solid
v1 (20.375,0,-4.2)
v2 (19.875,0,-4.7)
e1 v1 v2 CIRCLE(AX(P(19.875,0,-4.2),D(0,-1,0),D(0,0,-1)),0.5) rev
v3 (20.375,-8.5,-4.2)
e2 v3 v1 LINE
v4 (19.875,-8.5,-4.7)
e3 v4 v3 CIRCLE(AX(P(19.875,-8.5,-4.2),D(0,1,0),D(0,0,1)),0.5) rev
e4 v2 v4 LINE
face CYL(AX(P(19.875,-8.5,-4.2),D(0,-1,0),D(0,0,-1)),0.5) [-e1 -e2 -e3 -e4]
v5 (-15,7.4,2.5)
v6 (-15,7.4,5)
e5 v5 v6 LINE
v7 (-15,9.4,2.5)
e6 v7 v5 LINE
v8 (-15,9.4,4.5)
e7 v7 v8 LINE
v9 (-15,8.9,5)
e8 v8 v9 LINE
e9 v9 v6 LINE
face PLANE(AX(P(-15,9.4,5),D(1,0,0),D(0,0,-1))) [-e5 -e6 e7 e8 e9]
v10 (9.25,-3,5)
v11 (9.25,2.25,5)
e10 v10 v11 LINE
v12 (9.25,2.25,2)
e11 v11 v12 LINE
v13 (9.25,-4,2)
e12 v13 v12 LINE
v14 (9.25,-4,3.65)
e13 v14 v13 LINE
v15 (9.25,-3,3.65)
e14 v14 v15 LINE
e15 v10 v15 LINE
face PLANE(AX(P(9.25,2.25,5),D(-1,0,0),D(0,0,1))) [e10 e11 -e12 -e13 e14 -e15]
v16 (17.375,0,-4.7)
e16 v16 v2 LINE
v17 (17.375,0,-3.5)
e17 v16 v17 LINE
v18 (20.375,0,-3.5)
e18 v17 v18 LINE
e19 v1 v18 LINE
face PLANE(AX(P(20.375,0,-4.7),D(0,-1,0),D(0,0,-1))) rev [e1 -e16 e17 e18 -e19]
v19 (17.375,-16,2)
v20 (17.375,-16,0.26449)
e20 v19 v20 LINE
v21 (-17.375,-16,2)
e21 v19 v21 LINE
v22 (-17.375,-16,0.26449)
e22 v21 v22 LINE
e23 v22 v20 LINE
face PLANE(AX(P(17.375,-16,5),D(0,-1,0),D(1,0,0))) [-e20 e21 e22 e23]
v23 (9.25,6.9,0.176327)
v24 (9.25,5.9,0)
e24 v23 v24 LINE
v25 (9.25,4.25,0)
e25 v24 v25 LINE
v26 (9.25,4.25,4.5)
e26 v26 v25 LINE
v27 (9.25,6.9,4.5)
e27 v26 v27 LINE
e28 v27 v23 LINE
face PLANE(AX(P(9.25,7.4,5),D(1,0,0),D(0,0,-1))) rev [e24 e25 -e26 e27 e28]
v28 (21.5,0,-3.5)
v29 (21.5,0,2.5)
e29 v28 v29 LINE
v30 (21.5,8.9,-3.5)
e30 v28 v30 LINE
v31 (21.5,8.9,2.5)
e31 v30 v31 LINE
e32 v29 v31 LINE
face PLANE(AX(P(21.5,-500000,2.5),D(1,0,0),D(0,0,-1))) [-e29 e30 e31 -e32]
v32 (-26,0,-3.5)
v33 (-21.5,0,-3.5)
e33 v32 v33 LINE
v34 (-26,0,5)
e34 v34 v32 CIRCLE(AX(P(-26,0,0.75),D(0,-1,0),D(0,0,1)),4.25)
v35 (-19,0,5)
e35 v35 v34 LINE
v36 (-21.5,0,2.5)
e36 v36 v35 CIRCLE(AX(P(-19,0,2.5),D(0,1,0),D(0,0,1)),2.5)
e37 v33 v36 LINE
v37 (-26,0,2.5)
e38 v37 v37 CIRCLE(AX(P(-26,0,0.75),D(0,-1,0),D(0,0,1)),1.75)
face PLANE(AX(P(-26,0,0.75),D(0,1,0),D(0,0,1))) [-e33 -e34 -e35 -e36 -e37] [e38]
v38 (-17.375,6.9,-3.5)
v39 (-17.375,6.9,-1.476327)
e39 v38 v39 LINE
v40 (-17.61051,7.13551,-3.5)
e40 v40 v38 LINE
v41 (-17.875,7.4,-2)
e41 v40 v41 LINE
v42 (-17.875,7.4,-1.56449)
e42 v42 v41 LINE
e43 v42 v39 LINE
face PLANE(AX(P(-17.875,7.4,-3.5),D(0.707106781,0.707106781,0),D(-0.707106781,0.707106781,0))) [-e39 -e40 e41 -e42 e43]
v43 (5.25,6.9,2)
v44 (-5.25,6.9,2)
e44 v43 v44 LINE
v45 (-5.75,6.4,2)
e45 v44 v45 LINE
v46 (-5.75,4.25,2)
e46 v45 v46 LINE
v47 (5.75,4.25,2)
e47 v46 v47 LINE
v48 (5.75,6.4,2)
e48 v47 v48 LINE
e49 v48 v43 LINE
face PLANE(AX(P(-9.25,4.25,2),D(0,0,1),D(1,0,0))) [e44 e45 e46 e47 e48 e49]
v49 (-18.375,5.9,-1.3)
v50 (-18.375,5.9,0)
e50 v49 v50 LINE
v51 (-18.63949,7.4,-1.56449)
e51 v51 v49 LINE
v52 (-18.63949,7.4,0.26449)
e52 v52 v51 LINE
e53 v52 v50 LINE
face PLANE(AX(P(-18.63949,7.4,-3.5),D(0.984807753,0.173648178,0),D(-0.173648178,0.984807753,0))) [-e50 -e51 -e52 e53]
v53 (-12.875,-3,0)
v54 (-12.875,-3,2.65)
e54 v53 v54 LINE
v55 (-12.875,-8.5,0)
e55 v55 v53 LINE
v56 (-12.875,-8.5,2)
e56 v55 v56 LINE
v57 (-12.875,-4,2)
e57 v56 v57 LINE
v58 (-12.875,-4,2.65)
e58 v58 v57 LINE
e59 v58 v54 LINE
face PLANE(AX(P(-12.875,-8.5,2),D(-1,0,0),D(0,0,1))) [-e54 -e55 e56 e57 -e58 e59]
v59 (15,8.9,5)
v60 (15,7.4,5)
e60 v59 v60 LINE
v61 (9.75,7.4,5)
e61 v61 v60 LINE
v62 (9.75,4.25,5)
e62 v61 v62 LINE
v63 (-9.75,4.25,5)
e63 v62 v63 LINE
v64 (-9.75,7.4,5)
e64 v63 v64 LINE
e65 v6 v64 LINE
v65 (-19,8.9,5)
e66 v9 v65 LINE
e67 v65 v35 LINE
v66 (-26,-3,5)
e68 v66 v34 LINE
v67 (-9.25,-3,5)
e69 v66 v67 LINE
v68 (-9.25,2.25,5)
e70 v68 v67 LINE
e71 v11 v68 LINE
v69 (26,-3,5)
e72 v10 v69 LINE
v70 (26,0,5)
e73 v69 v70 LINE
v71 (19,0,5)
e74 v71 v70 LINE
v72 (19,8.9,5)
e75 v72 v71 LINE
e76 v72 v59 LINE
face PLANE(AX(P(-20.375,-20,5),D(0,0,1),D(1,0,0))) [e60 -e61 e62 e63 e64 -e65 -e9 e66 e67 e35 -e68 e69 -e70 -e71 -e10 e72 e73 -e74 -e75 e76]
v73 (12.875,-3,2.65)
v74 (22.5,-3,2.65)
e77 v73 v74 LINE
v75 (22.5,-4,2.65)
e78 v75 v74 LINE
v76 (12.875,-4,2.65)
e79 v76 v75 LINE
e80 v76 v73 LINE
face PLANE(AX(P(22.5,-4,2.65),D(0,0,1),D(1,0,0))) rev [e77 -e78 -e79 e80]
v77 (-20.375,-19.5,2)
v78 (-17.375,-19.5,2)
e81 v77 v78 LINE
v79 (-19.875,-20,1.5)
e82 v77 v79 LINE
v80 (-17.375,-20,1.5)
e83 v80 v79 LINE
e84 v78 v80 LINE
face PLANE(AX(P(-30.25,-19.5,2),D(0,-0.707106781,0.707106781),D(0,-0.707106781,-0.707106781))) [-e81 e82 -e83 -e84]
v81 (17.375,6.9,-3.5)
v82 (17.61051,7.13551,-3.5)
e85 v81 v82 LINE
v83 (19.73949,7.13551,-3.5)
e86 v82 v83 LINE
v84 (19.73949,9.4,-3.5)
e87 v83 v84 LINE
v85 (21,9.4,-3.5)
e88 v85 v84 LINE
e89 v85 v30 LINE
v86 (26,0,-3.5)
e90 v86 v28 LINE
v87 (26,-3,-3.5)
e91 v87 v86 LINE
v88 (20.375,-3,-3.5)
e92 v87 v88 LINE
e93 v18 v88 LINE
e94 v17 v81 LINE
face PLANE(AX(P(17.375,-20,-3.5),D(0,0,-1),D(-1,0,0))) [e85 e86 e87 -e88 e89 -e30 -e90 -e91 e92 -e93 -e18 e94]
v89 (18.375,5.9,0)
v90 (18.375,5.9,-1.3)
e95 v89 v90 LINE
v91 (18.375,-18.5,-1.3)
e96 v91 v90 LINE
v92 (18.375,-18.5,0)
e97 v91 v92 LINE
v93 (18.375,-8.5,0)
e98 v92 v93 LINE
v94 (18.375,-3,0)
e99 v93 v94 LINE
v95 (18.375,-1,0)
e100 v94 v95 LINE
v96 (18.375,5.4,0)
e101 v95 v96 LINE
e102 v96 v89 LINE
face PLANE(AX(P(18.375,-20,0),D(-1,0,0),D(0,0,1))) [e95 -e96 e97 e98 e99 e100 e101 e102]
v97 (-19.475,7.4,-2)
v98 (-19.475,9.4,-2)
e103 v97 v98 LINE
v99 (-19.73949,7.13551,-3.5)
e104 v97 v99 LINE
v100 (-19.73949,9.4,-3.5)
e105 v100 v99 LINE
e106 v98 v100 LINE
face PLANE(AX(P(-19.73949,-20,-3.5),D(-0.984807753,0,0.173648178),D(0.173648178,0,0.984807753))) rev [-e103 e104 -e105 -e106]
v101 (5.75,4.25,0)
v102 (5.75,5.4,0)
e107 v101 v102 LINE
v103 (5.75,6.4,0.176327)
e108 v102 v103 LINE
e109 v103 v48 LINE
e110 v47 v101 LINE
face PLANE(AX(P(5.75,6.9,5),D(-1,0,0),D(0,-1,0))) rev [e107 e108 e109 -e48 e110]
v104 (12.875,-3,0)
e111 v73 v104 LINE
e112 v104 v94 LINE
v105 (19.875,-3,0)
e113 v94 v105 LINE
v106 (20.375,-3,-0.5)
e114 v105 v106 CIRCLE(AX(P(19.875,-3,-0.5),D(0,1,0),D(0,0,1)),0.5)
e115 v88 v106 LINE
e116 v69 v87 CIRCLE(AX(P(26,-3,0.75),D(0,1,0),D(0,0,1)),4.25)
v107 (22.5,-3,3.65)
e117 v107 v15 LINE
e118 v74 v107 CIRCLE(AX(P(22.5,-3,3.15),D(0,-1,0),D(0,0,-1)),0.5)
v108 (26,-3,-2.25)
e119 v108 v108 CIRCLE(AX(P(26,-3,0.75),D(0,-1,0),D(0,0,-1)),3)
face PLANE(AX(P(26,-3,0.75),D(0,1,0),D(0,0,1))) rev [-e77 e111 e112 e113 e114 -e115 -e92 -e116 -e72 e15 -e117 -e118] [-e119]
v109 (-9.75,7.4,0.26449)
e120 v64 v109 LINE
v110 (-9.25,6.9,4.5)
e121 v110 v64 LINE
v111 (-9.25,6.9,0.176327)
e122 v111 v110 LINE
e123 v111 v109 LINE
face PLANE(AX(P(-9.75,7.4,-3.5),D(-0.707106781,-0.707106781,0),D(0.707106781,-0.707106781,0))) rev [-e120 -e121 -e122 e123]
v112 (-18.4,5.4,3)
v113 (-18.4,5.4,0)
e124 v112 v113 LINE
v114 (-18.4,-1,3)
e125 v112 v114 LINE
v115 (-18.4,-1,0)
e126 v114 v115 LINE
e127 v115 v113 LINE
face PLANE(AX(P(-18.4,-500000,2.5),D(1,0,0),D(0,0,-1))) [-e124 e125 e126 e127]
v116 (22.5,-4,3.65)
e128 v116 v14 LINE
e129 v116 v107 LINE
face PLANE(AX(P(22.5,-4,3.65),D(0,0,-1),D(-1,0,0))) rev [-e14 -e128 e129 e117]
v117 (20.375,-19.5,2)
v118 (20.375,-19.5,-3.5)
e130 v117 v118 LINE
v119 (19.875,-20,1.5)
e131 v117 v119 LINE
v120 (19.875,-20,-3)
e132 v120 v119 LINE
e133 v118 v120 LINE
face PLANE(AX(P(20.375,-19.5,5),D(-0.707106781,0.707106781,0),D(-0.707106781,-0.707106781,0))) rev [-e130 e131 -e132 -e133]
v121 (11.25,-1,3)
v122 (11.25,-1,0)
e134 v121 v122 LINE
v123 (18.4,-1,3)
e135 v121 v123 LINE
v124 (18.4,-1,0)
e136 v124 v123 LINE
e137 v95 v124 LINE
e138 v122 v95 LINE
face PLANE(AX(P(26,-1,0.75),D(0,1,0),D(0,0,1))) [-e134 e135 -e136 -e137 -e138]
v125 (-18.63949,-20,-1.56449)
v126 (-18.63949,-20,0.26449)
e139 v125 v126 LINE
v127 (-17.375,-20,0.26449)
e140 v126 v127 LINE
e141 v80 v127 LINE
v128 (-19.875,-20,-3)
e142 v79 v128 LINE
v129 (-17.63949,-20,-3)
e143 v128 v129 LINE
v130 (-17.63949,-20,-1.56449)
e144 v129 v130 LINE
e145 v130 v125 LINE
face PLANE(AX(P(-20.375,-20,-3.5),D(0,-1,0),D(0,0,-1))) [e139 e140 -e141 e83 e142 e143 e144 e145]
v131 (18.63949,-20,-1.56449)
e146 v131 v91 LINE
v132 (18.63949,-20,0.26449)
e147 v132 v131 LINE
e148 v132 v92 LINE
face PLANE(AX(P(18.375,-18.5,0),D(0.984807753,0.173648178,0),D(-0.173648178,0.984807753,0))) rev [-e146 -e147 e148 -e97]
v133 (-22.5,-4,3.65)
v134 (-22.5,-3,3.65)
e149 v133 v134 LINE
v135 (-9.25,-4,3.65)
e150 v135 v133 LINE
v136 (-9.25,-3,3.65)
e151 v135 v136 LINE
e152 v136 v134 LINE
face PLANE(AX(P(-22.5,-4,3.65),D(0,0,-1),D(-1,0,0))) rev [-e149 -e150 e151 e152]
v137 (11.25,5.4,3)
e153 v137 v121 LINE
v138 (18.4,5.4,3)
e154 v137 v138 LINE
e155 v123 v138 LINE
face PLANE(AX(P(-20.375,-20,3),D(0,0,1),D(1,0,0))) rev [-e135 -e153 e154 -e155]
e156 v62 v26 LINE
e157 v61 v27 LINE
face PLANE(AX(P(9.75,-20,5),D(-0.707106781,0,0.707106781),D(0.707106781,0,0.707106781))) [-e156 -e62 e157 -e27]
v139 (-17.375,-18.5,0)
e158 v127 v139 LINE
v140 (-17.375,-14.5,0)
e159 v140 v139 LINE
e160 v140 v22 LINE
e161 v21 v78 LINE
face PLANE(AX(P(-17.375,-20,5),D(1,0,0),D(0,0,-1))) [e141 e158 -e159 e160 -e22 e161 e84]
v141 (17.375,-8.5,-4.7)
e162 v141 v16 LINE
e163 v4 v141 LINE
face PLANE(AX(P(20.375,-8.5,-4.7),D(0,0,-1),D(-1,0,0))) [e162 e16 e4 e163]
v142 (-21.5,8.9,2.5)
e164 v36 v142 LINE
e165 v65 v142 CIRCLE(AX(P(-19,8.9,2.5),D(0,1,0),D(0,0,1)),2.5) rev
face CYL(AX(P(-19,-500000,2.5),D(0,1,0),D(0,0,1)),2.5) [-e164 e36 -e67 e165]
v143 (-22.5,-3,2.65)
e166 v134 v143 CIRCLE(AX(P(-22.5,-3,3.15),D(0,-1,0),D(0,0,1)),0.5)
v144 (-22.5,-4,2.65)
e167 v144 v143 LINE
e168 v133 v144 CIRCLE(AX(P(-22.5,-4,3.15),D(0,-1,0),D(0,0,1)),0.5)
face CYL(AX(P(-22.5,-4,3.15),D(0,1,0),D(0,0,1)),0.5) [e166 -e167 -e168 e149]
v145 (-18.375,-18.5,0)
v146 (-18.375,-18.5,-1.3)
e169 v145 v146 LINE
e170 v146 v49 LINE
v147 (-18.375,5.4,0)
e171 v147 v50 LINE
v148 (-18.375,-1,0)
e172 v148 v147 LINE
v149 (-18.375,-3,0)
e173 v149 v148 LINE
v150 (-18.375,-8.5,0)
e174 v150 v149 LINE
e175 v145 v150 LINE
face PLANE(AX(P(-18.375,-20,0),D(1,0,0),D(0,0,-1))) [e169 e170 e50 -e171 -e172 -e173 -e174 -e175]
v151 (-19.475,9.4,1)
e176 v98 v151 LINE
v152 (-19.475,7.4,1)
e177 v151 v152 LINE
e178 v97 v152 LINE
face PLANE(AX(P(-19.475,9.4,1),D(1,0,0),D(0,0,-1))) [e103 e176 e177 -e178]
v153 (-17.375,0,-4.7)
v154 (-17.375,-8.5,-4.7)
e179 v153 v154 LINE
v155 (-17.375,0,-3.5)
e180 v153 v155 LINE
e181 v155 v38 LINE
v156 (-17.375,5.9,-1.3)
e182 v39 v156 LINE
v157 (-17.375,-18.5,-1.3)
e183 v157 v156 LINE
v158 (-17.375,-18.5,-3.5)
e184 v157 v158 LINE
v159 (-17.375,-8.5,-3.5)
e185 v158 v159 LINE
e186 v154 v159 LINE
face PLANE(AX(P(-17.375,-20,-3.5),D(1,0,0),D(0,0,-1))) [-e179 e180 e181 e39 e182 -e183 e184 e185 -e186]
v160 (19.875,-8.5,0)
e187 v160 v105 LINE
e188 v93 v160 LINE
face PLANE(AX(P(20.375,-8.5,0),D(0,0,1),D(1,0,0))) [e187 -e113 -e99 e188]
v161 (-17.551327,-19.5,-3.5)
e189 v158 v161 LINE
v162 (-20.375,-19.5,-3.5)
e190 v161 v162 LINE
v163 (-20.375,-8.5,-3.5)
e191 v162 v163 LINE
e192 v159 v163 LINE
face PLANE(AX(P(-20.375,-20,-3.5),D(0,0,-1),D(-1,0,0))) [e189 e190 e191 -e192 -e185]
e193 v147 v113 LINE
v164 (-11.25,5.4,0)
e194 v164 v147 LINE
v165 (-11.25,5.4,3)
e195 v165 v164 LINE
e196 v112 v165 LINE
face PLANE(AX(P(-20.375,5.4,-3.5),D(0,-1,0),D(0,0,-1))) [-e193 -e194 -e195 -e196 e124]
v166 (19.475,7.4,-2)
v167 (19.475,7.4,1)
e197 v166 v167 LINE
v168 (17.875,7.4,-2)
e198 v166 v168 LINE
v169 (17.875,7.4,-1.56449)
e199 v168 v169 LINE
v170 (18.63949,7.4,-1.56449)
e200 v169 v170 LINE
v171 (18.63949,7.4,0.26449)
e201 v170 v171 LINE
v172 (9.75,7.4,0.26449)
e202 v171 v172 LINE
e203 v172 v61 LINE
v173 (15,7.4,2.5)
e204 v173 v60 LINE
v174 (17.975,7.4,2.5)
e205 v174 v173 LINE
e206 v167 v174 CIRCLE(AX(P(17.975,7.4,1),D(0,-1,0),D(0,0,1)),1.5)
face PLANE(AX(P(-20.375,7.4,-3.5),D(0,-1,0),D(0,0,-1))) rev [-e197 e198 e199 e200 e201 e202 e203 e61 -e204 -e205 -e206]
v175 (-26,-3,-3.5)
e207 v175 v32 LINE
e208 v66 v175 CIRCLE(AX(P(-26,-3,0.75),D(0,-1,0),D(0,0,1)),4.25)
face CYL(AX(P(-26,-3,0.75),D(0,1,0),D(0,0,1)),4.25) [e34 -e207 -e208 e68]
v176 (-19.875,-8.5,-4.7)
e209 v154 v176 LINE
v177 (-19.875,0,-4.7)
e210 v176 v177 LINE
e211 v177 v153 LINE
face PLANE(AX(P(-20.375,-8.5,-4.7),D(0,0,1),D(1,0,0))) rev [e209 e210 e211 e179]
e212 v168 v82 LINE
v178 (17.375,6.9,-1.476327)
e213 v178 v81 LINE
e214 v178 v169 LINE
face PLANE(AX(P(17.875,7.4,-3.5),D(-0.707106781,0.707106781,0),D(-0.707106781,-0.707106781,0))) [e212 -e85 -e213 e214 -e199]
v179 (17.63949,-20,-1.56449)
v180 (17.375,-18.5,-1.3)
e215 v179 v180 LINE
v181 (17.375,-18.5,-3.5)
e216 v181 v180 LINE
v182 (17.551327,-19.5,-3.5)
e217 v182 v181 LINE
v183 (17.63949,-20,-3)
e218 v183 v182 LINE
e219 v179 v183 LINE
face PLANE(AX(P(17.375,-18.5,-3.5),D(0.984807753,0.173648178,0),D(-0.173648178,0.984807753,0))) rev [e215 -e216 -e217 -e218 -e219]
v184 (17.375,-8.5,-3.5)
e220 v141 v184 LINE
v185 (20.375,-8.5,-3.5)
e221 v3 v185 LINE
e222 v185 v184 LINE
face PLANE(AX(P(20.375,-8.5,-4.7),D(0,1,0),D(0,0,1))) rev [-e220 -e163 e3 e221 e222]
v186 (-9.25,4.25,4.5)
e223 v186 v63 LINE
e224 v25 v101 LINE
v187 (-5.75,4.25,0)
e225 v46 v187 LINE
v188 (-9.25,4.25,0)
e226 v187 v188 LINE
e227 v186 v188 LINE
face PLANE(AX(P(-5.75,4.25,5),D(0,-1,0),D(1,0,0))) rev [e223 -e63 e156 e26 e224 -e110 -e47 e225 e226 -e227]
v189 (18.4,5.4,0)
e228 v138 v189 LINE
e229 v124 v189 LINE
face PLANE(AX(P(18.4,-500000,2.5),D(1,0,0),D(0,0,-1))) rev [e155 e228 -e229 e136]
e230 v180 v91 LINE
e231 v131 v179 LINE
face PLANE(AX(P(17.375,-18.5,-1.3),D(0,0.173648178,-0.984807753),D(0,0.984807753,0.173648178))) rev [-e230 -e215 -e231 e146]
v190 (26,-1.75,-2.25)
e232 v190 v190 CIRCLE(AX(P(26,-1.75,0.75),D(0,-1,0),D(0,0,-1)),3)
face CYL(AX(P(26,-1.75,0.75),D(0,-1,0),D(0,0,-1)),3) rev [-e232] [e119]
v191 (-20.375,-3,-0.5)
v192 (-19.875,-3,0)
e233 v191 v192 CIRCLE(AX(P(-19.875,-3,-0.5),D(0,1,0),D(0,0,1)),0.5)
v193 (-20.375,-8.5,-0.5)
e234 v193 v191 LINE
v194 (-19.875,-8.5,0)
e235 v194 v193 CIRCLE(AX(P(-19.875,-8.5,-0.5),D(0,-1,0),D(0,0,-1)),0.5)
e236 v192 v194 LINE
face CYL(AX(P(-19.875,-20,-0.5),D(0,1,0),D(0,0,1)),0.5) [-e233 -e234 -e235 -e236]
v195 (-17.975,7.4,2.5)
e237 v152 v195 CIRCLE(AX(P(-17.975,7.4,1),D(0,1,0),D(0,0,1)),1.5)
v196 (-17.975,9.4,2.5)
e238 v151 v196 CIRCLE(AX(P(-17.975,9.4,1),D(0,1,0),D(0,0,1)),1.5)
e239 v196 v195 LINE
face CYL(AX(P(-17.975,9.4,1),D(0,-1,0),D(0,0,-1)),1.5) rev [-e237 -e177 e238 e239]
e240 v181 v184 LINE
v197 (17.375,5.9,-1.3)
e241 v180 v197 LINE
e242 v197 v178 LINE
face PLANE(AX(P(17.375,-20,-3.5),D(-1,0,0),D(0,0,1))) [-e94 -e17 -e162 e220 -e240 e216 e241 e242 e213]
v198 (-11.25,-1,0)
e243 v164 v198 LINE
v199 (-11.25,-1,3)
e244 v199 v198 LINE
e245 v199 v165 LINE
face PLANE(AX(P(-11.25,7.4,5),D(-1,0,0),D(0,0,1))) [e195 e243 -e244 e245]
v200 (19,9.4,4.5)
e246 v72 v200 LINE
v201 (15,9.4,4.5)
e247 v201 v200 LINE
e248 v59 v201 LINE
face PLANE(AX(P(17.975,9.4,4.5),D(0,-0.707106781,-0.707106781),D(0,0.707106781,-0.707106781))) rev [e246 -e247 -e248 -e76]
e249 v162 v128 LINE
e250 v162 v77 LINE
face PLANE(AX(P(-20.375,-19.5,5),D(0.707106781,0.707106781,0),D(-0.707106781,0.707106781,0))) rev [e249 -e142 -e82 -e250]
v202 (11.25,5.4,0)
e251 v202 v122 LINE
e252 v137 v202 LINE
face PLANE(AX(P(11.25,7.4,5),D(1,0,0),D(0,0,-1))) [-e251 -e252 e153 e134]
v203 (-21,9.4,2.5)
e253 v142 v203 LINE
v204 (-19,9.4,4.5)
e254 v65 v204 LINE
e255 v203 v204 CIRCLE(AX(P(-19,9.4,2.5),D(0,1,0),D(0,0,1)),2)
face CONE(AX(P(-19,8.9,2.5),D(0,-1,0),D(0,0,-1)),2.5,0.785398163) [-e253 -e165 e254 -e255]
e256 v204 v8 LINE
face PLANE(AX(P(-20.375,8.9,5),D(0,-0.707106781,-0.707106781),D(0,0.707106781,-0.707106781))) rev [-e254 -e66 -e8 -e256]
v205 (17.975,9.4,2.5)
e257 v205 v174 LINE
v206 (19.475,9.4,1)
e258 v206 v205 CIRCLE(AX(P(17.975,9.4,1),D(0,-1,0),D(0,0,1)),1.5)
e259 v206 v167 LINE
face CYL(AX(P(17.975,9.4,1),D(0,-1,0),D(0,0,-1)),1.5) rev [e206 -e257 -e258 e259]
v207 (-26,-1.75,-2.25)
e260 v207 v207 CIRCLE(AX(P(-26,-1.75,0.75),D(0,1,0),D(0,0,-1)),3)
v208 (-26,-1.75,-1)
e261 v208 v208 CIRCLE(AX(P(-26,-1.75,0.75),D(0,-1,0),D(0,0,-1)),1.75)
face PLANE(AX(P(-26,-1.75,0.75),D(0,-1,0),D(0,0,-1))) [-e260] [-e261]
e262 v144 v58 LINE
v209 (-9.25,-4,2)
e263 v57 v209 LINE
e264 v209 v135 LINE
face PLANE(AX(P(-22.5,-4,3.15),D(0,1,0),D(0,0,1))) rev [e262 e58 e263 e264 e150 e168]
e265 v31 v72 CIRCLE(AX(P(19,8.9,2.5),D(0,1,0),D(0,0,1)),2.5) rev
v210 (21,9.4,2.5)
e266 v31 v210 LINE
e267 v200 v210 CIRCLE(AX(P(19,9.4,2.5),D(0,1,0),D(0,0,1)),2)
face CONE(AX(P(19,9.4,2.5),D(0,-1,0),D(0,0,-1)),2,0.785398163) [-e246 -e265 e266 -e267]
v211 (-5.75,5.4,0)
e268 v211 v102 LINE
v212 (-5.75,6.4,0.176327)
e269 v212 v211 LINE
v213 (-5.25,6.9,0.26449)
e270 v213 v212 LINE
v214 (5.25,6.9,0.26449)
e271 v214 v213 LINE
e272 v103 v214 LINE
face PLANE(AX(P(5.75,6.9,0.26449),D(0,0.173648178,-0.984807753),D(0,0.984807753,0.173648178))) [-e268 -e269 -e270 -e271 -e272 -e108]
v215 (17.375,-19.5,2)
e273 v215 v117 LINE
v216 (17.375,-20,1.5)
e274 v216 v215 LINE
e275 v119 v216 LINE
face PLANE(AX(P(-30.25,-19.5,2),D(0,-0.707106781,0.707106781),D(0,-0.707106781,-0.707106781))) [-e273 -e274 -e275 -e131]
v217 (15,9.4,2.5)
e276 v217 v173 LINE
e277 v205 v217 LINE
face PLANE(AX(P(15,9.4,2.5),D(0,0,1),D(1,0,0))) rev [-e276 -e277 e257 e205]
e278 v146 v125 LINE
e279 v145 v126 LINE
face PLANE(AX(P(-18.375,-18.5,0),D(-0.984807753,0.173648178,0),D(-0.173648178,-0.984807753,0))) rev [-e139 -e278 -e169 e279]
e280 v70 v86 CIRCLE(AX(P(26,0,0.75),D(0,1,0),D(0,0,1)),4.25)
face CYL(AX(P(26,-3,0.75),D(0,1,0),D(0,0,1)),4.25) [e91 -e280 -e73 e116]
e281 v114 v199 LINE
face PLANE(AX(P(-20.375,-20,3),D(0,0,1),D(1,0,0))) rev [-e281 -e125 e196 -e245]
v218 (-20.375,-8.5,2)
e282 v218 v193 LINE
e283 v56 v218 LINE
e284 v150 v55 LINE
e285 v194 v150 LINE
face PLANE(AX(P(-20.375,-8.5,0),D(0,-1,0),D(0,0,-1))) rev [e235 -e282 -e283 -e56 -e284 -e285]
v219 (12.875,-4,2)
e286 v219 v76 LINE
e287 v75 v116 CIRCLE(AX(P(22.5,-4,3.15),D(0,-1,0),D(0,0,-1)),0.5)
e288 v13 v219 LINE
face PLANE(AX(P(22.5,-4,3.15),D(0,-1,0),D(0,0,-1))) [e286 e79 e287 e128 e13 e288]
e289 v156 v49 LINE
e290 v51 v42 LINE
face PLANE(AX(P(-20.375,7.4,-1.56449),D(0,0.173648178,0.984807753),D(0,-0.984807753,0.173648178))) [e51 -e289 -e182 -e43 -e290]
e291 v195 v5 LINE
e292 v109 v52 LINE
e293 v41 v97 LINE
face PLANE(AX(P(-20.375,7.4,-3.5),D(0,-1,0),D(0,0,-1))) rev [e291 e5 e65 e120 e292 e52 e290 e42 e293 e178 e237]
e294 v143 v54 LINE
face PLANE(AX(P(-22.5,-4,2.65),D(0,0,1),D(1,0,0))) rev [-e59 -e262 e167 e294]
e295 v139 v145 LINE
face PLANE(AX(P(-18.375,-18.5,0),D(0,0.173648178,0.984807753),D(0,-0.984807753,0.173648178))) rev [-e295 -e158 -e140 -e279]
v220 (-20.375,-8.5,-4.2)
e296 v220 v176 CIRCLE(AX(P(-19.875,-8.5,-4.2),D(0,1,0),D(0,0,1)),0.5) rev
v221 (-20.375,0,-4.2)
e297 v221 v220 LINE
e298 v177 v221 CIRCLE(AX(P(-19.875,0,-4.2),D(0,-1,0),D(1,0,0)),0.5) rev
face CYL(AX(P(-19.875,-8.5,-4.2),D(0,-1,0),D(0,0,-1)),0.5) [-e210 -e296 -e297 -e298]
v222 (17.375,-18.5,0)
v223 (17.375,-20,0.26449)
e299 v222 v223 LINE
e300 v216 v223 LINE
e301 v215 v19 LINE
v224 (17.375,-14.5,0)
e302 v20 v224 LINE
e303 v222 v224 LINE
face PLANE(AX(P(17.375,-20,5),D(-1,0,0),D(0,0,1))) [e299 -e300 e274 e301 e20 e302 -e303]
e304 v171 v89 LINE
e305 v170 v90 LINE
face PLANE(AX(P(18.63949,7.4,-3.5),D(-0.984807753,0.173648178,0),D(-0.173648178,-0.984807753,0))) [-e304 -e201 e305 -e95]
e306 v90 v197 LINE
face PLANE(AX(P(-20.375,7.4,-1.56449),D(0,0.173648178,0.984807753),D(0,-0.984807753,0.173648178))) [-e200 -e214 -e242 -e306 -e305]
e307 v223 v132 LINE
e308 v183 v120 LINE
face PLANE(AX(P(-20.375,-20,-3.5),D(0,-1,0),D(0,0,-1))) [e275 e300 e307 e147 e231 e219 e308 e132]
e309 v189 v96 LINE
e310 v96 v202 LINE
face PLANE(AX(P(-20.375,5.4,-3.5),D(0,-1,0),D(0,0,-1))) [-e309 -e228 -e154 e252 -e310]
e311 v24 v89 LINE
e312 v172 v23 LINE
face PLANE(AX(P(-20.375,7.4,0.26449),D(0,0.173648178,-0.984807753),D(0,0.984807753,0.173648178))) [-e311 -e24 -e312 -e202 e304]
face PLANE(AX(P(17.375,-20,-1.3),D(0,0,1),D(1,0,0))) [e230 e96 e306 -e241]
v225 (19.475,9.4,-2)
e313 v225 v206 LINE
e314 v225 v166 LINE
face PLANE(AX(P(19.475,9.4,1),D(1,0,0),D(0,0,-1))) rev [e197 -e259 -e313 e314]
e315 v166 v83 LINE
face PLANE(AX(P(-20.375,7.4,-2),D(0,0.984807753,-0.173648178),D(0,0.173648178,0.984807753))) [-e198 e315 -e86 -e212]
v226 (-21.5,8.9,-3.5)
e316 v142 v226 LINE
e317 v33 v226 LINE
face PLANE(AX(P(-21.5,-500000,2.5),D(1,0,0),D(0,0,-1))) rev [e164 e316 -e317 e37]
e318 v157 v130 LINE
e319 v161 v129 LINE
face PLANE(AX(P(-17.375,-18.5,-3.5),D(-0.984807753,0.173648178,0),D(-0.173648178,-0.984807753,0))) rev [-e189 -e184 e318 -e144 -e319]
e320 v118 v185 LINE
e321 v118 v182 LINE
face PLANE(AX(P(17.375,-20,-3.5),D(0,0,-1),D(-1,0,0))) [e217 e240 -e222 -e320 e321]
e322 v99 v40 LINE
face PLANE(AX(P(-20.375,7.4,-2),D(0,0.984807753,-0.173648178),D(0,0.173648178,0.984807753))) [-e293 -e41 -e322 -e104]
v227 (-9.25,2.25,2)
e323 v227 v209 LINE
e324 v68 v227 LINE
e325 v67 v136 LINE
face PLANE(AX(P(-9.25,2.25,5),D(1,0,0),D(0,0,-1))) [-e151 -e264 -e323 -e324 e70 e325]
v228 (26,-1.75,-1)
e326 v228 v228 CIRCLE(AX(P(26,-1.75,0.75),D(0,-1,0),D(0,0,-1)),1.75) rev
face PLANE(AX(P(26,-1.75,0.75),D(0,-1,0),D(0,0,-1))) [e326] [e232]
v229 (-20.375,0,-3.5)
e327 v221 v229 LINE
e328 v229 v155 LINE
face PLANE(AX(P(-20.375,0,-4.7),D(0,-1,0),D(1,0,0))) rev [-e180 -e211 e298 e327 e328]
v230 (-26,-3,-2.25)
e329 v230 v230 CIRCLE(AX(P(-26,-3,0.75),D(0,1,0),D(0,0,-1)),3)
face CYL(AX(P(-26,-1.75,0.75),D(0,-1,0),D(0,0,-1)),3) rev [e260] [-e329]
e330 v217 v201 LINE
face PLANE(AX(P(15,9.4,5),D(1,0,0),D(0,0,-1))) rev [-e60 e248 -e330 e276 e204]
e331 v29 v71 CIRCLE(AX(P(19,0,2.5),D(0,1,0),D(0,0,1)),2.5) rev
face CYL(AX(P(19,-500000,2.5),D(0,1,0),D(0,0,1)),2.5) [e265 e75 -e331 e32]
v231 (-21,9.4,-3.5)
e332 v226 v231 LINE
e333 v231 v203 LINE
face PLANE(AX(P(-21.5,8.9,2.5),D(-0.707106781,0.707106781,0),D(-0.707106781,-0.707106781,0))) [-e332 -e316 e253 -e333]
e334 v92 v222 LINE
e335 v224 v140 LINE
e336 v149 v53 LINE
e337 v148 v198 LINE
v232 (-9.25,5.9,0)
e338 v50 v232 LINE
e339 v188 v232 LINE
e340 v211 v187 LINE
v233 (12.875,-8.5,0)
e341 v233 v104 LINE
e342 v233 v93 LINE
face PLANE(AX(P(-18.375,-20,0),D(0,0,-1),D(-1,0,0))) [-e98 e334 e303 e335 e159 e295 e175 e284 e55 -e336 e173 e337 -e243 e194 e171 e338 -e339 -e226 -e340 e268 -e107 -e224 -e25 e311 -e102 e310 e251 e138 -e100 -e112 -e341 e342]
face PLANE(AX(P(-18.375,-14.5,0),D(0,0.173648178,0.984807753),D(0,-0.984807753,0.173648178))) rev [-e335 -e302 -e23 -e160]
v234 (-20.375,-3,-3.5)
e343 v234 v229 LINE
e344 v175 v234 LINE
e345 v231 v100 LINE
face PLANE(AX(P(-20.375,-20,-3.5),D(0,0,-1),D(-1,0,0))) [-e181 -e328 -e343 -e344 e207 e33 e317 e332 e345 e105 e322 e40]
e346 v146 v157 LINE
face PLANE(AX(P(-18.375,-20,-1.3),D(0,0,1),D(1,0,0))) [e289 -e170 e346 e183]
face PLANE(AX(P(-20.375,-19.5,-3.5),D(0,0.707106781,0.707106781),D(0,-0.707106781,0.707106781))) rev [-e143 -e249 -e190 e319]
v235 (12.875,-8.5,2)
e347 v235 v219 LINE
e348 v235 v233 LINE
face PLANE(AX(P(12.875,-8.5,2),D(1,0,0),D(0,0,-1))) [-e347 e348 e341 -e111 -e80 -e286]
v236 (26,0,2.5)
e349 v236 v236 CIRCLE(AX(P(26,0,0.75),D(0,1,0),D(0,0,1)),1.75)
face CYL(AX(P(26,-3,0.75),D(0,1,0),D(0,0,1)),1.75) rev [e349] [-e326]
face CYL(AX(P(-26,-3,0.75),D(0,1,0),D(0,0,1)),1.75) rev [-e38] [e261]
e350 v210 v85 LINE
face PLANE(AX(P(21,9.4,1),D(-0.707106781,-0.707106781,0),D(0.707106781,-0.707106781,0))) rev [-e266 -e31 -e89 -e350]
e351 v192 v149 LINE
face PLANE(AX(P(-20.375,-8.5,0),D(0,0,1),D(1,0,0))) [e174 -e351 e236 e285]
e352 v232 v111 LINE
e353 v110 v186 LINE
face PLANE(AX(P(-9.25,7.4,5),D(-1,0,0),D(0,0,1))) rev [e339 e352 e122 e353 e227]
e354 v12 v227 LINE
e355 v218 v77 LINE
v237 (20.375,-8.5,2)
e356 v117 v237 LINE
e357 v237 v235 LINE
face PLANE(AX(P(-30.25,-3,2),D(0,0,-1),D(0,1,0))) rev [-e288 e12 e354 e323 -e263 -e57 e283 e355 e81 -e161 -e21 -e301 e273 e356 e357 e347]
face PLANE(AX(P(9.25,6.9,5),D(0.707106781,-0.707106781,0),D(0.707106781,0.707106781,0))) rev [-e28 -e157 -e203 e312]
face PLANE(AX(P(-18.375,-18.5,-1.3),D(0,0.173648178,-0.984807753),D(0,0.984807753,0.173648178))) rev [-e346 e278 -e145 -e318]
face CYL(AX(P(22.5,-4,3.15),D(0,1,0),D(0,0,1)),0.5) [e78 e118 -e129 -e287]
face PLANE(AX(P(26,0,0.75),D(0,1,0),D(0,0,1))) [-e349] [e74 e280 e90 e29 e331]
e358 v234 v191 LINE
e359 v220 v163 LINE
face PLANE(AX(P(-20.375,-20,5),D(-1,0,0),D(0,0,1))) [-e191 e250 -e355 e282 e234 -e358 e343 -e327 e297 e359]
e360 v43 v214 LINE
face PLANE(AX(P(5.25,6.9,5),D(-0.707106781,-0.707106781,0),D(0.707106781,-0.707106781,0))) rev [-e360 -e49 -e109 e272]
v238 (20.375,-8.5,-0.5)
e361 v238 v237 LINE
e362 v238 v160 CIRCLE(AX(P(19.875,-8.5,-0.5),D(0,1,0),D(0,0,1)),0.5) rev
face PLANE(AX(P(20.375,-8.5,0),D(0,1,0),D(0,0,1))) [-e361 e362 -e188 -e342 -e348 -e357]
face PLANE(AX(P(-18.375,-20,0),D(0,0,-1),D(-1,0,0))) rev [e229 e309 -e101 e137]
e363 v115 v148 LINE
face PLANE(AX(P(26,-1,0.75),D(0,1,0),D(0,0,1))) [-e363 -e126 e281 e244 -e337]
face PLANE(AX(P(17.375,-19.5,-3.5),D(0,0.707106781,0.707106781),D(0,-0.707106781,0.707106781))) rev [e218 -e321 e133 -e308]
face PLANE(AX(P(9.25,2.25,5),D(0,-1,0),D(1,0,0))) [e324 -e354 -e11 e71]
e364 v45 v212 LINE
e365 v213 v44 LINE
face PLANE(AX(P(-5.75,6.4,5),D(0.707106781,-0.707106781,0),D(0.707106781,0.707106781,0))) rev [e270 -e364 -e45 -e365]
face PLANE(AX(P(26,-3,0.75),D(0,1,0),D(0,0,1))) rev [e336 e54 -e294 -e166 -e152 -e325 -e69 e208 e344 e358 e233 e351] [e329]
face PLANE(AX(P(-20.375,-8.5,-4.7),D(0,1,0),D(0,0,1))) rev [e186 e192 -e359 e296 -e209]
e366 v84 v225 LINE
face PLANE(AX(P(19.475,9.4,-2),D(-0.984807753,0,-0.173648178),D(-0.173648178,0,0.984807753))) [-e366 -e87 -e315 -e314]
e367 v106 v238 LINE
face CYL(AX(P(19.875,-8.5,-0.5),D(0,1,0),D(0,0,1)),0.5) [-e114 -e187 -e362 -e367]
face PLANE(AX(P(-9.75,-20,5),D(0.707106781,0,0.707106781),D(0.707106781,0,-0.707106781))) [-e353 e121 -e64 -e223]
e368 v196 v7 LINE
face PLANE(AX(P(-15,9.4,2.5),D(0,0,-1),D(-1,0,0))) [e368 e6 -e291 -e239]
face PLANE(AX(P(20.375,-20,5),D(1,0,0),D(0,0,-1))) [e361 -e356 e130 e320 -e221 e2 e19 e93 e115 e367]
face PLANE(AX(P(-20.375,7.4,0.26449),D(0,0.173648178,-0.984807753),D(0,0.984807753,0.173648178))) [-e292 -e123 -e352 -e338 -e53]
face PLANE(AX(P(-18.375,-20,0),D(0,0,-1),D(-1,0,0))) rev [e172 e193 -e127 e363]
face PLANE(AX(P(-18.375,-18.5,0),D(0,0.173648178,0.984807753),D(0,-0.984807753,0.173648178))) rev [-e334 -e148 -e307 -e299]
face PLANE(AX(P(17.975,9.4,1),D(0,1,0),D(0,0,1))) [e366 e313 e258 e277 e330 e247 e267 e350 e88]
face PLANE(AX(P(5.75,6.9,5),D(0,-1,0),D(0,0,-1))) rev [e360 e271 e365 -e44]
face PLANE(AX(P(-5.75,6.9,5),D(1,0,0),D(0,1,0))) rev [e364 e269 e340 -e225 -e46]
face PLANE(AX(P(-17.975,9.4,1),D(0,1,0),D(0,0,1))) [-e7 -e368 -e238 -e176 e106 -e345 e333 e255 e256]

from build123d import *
from OCP.BRepFilletAPI import BRepFilletAPI_MakeChamfer

# Parameters (mm, degrees)
BOSS_EXTRUDE1_DEPTH             = 7.4
BOSS_EXTRUDE1_DEPTH_BACK        = 20
SKETCH2_R                       = 1.75
BOSS_EXTRUDE2_DEPTH             = 3
BOSS_EXTRUDE7_DEPTH             = 2
BOSS_EXTRUDE7_DIRECTION_2_REACH = 43.12
SKETCH21_R                      = 3
CUT_EXTRUDE11_DEPTH             = 1.25
CUT_EXTRUDE10_START             = -7.4
CUT_EXTRUDE10_DEPTH             = 7.4
CUT_EXTRUDE3_DEPTH              = 37.60686411
CUT_EXTRUDE3_DEPTH_BACK         = 37.60686411
SKETCH12_W                      = 3
SKETCH12_H                      = 17
CUT_EXTRUDE6_DEPTH              = 37.60686411
SKETCH19_W                      = 18.5
SKETCH19_H                      = 3.15
SKETCH19_H_2                    = 5.25
CUT_EXTRUDE9_DEPTH              = 37.678501878
SHELL1_OUTLINE_W                = 7.15
SHELL1_OUTLINE_H                = 6.4
SHELL1_DEPTH                    = 3
SKETCH13_W                      = 34.75
SKETCH13_H                      = 4
CUT_EXTRUDE4_DEPTH              = 37.60686411
SKETCH22_W                      = 7.5
SKETCH22_H                      = 2
CUT_EXTRUDE12_DEPTH             = 5.5
SKETCH23_W                      = 3
SKETCH23_H                      = 8.5
BOSS_EXTRUDE8_DEPTH             = 1.2
FILLET2_R                       = 0.5
CHAMFER3_SIZE                   = 0.5
CHAMFER4_SIZE                   = 0.5
BOSS_EXTRUDE9_DEPTH             = 1
CHAMFER5_SIZE                   = 1.5
CHAMFER5_SIZE2                  = 0.264490471


# Read off the part's stored shape, not the designer's step: Shell1
with BuildPart() as part:
    # Sketch1 → Boss-Extrude1 (new, two sides: drawn at the far end of the back side and taken through both)
    with BuildSketch(Plane(origin=(0, 0, 0), x_dir=(1, 0, 0), z_dir=(0, 1, 0)).offset(-BOSS_EXTRUDE1_DEPTH_BACK)):
        Polygon((17.375, 3.5), (20.375, 3.5), (20.375, -5), (-20.375, -5), (-20.375, 3.5), (-17.375, 3.5), (-17.375, 1.3), (-18.375, 1.3), (-18.375, 0), (18.375, 0), (18.375, 1.3), (17.375, 1.3), align=None)
    extrude(amount=BOSS_EXTRUDE1_DEPTH + BOSS_EXTRUDE1_DEPTH_BACK)

    # Sketch2 → Boss-Extrude2 (add)
    with BuildSketch(Plane(origin=(0, 0, 0), x_dir=(1, 0, 0), z_dir=(0, 1, 0))):
        with BuildLine():
            Line((20.375, -5), (26, -5))
            ThreePointArc((26, -5), (30.25, -0.75), (26, 3.5))
            Line((26, 3.5), (20.375, 3.5))
            Line((20.375, 3.5), (20.375, -5))
        make_face()
        with Locations(Location((26, -0.75, 0), (0, 0, 270))):
            Circle(SKETCH2_R, mode=Mode.SUBTRACT)
    boss_extrude2 = extrude(amount=-BOSS_EXTRUDE2_DEPTH)

    # Sketch8 → Boss-Extrude7 (add)
    with BuildSketch(Plane(origin=(0, 7.4, 0), x_dir=(1, 0, 0), z_dir=(0, 1, 0))):
        with BuildLine():
            Line((15, -5), (19, -5))
            ThreePointArc((19, -5), (20.767766953, -4.267766953), (21.5, -2.5))
            Line((21.5, -2.5), (21.5, 3.5))
            Line((21.5, 3.5), (19.475, 3.5))
            Line((19.475, 3.5), (19.475, -1))
            ThreePointArc((19.475, -1), (19.035660172, -2.060660172), (17.975, -2.5))
            Line((17.975, -2.5), (15, -2.5))
            Line((15, -2.5), (15, -5))
        make_face()
    boss_extrude7 = extrude(amount=BOSS_EXTRUDE7_DEPTH)

    # Sketch8 → Boss-Extrude7 direction 2 (add, up to next)
    with BuildSketch(Plane(origin=(0, 7.4, 0), x_dir=(1, 0, 0), z_dir=(0, 1, 0)), mode=Mode.PRIVATE) as boss_extrude7_direction_2_sk1:
        with BuildLine():
            Line((15, -5), (19, -5))
            ThreePointArc((19, -5), (20.767766953, -4.267766953), (21.5, -2.5))
            Line((21.5, -2.5), (21.5, 3.5))
            Line((21.5, 3.5), (19.475, 3.5))
            Line((19.475, 3.5), (19.475, -1))
            ThreePointArc((19.475, -1), (19.035660172, -2.060660172), (17.975, -2.5))
            Line((17.975, -2.5), (15, -2.5))
            Line((15, -2.5), (15, -5))
        make_face()
    boss_extrude7_direction_2_tool1 = extrude(boss_extrude7_direction_2_sk1.sketch, amount=-BOSS_EXTRUDE7_DIRECTION_2_REACH, mode=Mode.PRIVATE) - part.part
    boss_extrude7_direction_2 = boss_extrude7_direction_2_tool1.solids().sort_by_distance((16.4875, 7.4, 2.607005))[0]
    add(boss_extrude7_direction_2)

    # Sketch21 → Cut-Extrude11 (cut)
    with BuildSketch(Plane.XZ.offset(3)):
        with Locations(Location((26, 0.75, 0), (0, 0, 270))):
            Circle(SKETCH21_R)
    cut_extrude11 = extrude(amount=-CUT_EXTRUDE11_DEPTH, mode=Mode.SUBTRACT)

    # Sketch20 → Cut-Extrude10 (cut)
    with BuildSketch(Plane(origin=(0, 7.4, 0), x_dir=(1, 0, 0), z_dir=(0, 1, 0)).offset(CUT_EXTRUDE10_START)):
        with BuildLine():
            Line((20.375, -5), (20.375, -4.587911636))
            ThreePointArc((20.375, -4.587911636), (19.717711958, -4.894762941), (19, -5))
            Line((19, -5), (20.375, -5))
        make_face()
    cut_extrude10 = extrude(amount=CUT_EXTRUDE10_DEPTH, mode=Mode.SUBTRACT)

    # Mirror1: Boss-Extrude2, Boss-Extrude7, Boss-Extrude7 direction 2, Cut-Extrude11, Cut-Extrude10 across plane
    add(boss_extrude2.mirror(Plane(origin=(0, 0, 0), x_dir=(0, 0, 1), z_dir=(1, 0, 0))))
    add(boss_extrude7.mirror(Plane(origin=(0, 0, 0), x_dir=(0, 0, 1), z_dir=(1, 0, 0))))
    add(boss_extrude7_direction_2.mirror(Plane(origin=(0, 0, 0), x_dir=(0, 0, 1), z_dir=(1, 0, 0))))
    add(cut_extrude11.mirror(Plane(origin=(0, 0, 0), x_dir=(0, 0, 1), z_dir=(1, 0, 0))), mode=Mode.SUBTRACT)
    add(cut_extrude10.mirror(Plane(origin=(0, 0, 0), x_dir=(0, 0, 1), z_dir=(1, 0, 0))), mode=Mode.SUBTRACT)

    # Sketch12 → Cut-Extrude3 (cut, two sides: drawn at the far end of the back side and taken through both)
    with BuildSketch(Plane(origin=(0, 0, 0), x_dir=(0, 0, -1), z_dir=(1, 0, 0)).offset(-CUT_EXTRUDE3_DEPTH_BACK)):
        with Locations((-3.5, -11.5)):
            Rectangle(SKETCH12_W, SKETCH12_H)
    extrude(amount=CUT_EXTRUDE3_DEPTH + CUT_EXTRUDE3_DEPTH_BACK, mode=Mode.SUBTRACT)

    # Sketch15 → Cut-Extrude6 (cut, through all)
    with BuildSketch(Plane(origin=(0, 0, 0), x_dir=(-1, 0, 0), z_dir=(0, 0, -1))):
        Polygon((-9.25, 7.4), (-9.25, 4.25), (-5.75, 4.25), (-5.75, 6.9), (5.75, 6.9), (5.75, 4.25), (9.25, 4.25), (9.25, 7.4), align=None)
    extrude(amount=-CUT_EXTRUDE6_DEPTH, mode=Mode.SUBTRACT)

    # Sketch19 → Cut-Extrude9 (cut, through all)
    with BuildSketch(Plane.XY.offset(2)):
        with Locations((0, 5.825)):
            Rectangle(SKETCH19_W, SKETCH19_H)
        with Locations((0, -0.375)):
            Rectangle(SKETCH19_W, SKETCH19_H_2)
    extrude(amount=CUT_EXTRUDE9_DEPTH, mode=Mode.SUBTRACT)

    # Shell1 outline → Shell1 (cut)
    with BuildSketch(Plane.XY):
        with Locations((14.825, 2.2)):
            Rectangle(SHELL1_OUTLINE_W, SHELL1_OUTLINE_H)
        with Locations((-14.825, 2.2)):
            Rectangle(SHELL1_OUTLINE_W, SHELL1_OUTLINE_H)
    extrude(amount=SHELL1_DEPTH, mode=Mode.SUBTRACT)

    # Sketch13 → Cut-Extrude4 (cut, through all)
    with BuildSketch(Plane.XY):
        with Locations((0, -18)):
            Rectangle(SKETCH13_W, SKETCH13_H)
    extrude(amount=CUT_EXTRUDE4_DEPTH, mode=Mode.SUBTRACT)

    # Sketch22 → Cut-Extrude12 (cut)
    with BuildSketch(Plane.XZ.offset(3)):
        with Locations((16.625, 1)):
            Rectangle(SKETCH22_W, SKETCH22_H)
        with Locations((-16.625, 1)):
            Rectangle(SKETCH22_W, SKETCH22_H)
    extrude(amount=CUT_EXTRUDE12_DEPTH, mode=Mode.SUBTRACT)

    # Sketch23 → Boss-Extrude8 (add)
    with BuildSketch(Plane(origin=(0, 0, -3.5), x_dir=(-1, 0, 0), z_dir=(0, 0, -1))):
        with Locations((-18.875, -4.25)):
            Rectangle(SKETCH23_W, SKETCH23_H)
        with Locations((18.875, -4.25)):
            Rectangle(SKETCH23_W, SKETCH23_H)
    extrude(amount=BOSS_EXTRUDE8_DEPTH)

    # Fillet2
    fillet2_edges = [part.edges().sort_by_distance(p)[0] for p in [
        (20.375, -5.75, 0),
        (-20.375, -5.75, 0),
        (20.375, -4.25, -4.7),
        (-20.375, -4.25, -4.7),
    ]]
    fillet(fillet2_edges, radius=FILLET2_R)

    # Chamfer3
    chamfer3_edges = [part.edges().sort_by_distance(p)[0] for p in [
        (-20.767766953, 9.4, 4.267766953),
        (-21.5, 9.4, -0.5),
        (-17, 9.4, 5),
        (9.25, 7.4, 2.5),
        (-9.25, 5.825, 5),
        (-9.25, 7.4, 2.5),
        (9.25, 5.825, 5),
        (5.75, 6.9, 1),
        (-5.75, 6.9, 1),
        (17.375, 7.4, -2.4),
        (-17.375, 7.4, -2.4),
        (17, 9.4, 5),
        (20.767766953, 9.4, 4.267766953),
        (21.5, 9.4, -0.5),
    ]]
    chamfer(chamfer3_edges, length=CHAMFER3_SIZE)

    # Chamfer4
    chamfer4_edges = [part.edges().sort_by_distance(p)[0] for p in [
        (18.875, -20, -3.5),
        (20.375, -20, -0.75),
        (-18.875, -20, 2),
        (18.875, -20, 2),
        (-18.875, -20, -3.5),
        (-20.375, -20, -0.75),
    ]]
    chamfer(chamfer4_edges, length=CHAMFER4_SIZE)

    # Sketch25 → Boss-Extrude9 (add)
    with BuildSketch(Plane.XZ.offset(3)):
        with BuildLine():
            Line((-22.5, 2.65), (-12.875, 2.65))
            Line((-12.875, 2.65), (-12.875, 2))
            Line((-12.875, 2), (-9.25, 2))
            Line((-9.25, 2), (-9.25, 3.65))
            Line((-9.25, 3.65), (-22.5, 3.65))
            ThreePointArc((-22.5, 3.65), (-23, 3.15), (-22.5, 2.65))
        make_face()
        with BuildLine():
            Line((9.25, 2), (9.25, 3.65))
            Line((9.25, 3.65), (22.5, 3.65))
            ThreePointArc((22.5, 3.65), (23, 3.15), (22.5, 2.65))
            Line((22.5, 2.65), (12.875, 2.65))
            Line((12.875, 2.65), (12.875, 2))
            Line((12.875, 2), (9.25, 2))
        make_face()
    extrude(amount=BOSS_EXTRUDE9_DEPTH)

    # Chamfer5: one chamfer whose edges measure the first distance from different faces: ONE call of the kernel's chamfer builder (chamfer() names one face for all edges)
    chamfer5_edges_1 = [part.edges().sort_by_distance(p)[0] for p in [
        (-19.475, 8.4, -3.5),
    ]]
    chamfer5_side_1 = [part.faces().sort_by_distance(p)[0] for p in [
        (-19.475, 8.4, -1.25),
    ]]
    chamfer5_edges_2 = [part.edges().sort_by_distance(p)[0] for p in [
        (17.875, -20, -1.3),
        (18.125, 7.4, -1.3),
    ]]
    chamfer5_side_2 = [part.faces().sort_by_distance(p)[0] for p in [
        (17.87652765, -6.362022609, -1.3),
    ]]
    chamfer5_edges_3 = [part.edges().sort_by_distance(p)[0] for p in [
        (18.375, -20, -0.65),
        (18.375, 7.4, -0.65),
    ]]
    chamfer5_side_3 = [part.faces().sort_by_distance(p)[0] for p in [
        (18.375, -6.3, -0.65),
    ]]
    chamfer5_edges_4 = [part.edges().sort_by_distance(p)[0] for p in [
        (17.875, -20, 0),
        (-17.875, -20, 0),
        (0, -16, 0),
        (14.0625, 7.4, 0),
        (-14.0625, 7.4, 0),
        (0, 6.9, 0),
    ]]
    chamfer5_side_4 = [part.faces().sort_by_distance(p)[0] for p in [
        (0, -5.621913535, 0),
    ]]
    chamfer5_edges_5 = [part.edges().sort_by_distance(p)[0] for p in [
        (-18.375, -20, -0.65),
        (-18.375, 7.4, -0.65),
    ]]
    chamfer5_side_5 = [part.faces().sort_by_distance(p)[0] for p in [
        (-18.375, -6.3, -0.65),
    ]]
    chamfer5_edges_6 = [part.edges().sort_by_distance(p)[0] for p in [
        (-17.875, -20, -1.3),
        (-18.125, 7.4, -1.3),
    ]]
    chamfer5_side_6 = [part.faces().sort_by_distance(p)[0] for p in [
        (-17.87652765, -6.362022609, -1.3),
    ]]
    chamfer5_edges_7 = [part.edges().sort_by_distance(p)[0] for p in [
        (-17.375, -20, -2.15),
    ]]
    chamfer5_side_7 = [part.faces().sort_by_distance(p)[0] for p in [
        (-17.375, -6.18727649, -2.648694438),
    ]]
    chamfer5_edges_8 = [part.edges().sort_by_distance(p)[0] for p in [
        (-18.675, 7.4, -3.5),
    ]]
    chamfer5_side_8 = [part.faces().sort_by_distance(p)[0] for p in [
        (-14.347937222, 7.4, 1.651046547),
    ]]
    chamfer5_edges_9 = [part.edges().sort_by_distance(p)[0] for p in [
        (17.375, -20, -2.15),
    ]]
    chamfer5_side_9 = [part.faces().sort_by_distance(p)[0] for p in [
        (17.375, -6.18727649, -2.648694438),
    ]]
    chamfer5_edges_10 = [part.edges().sort_by_distance(p)[0] for p in [
        (18.675, 7.4, -3.5),
    ]]
    chamfer5_side_10 = [part.faces().sort_by_distance(p)[0] for p in [
        (14.347937222, 7.4, 1.651046547),
    ]]
    chamfer5_edges_11 = [part.edges().sort_by_distance(p)[0] for p in [
        (19.475, 8.4, -3.5),
    ]]
    chamfer5_side_11 = [part.faces().sort_by_distance(p)[0] for p in [
        (19.475, 8.4, -1.25),
    ]]
    chamfer5 = BRepFilletAPI_MakeChamfer(part.part.solid().wrapped)
    for e in chamfer5_edges_1:
        chamfer5.Add(CHAMFER5_SIZE, CHAMFER5_SIZE2, e.wrapped, chamfer5_side_1[0].wrapped)  # the first distance lies on this face
    for e in chamfer5_edges_2:
        chamfer5.Add(CHAMFER5_SIZE, CHAMFER5_SIZE2, e.wrapped, chamfer5_side_2[0].wrapped)  # the first distance lies on this face
    for e in chamfer5_edges_3:
        chamfer5.Add(CHAMFER5_SIZE, CHAMFER5_SIZE2, e.wrapped, chamfer5_side_3[0].wrapped)  # the first distance lies on this face
    for e in chamfer5_edges_4:
        chamfer5.Add(CHAMFER5_SIZE, CHAMFER5_SIZE2, e.wrapped, chamfer5_side_4[0].wrapped)  # the first distance lies on this face
    for e in chamfer5_edges_5:
        chamfer5.Add(CHAMFER5_SIZE, CHAMFER5_SIZE2, e.wrapped, chamfer5_side_5[0].wrapped)  # the first distance lies on this face
    for e in chamfer5_edges_6:
        chamfer5.Add(CHAMFER5_SIZE, CHAMFER5_SIZE2, e.wrapped, chamfer5_side_6[0].wrapped)  # the first distance lies on this face
    for e in chamfer5_edges_7:
        chamfer5.Add(CHAMFER5_SIZE, CHAMFER5_SIZE2, e.wrapped, chamfer5_side_7[0].wrapped)  # the first distance lies on this face
    for e in chamfer5_edges_8:
        chamfer5.Add(CHAMFER5_SIZE, CHAMFER5_SIZE2, e.wrapped, chamfer5_side_8[0].wrapped)  # the first distance lies on this face
    for e in chamfer5_edges_9:
        chamfer5.Add(CHAMFER5_SIZE, CHAMFER5_SIZE2, e.wrapped, chamfer5_side_9[0].wrapped)  # the first distance lies on this face
    for e in chamfer5_edges_10:
        chamfer5.Add(CHAMFER5_SIZE, CHAMFER5_SIZE2, e.wrapped, chamfer5_side_10[0].wrapped)  # the first distance lies on this face
    for e in chamfer5_edges_11:
        chamfer5.Add(CHAMFER5_SIZE, CHAMFER5_SIZE2, e.wrapped, chamfer5_side_11[0].wrapped)  # the first distance lies on this face
    add(Compound.cast(chamfer5.Shape()), mode=Mode.REPLACE)


solid = part.part
